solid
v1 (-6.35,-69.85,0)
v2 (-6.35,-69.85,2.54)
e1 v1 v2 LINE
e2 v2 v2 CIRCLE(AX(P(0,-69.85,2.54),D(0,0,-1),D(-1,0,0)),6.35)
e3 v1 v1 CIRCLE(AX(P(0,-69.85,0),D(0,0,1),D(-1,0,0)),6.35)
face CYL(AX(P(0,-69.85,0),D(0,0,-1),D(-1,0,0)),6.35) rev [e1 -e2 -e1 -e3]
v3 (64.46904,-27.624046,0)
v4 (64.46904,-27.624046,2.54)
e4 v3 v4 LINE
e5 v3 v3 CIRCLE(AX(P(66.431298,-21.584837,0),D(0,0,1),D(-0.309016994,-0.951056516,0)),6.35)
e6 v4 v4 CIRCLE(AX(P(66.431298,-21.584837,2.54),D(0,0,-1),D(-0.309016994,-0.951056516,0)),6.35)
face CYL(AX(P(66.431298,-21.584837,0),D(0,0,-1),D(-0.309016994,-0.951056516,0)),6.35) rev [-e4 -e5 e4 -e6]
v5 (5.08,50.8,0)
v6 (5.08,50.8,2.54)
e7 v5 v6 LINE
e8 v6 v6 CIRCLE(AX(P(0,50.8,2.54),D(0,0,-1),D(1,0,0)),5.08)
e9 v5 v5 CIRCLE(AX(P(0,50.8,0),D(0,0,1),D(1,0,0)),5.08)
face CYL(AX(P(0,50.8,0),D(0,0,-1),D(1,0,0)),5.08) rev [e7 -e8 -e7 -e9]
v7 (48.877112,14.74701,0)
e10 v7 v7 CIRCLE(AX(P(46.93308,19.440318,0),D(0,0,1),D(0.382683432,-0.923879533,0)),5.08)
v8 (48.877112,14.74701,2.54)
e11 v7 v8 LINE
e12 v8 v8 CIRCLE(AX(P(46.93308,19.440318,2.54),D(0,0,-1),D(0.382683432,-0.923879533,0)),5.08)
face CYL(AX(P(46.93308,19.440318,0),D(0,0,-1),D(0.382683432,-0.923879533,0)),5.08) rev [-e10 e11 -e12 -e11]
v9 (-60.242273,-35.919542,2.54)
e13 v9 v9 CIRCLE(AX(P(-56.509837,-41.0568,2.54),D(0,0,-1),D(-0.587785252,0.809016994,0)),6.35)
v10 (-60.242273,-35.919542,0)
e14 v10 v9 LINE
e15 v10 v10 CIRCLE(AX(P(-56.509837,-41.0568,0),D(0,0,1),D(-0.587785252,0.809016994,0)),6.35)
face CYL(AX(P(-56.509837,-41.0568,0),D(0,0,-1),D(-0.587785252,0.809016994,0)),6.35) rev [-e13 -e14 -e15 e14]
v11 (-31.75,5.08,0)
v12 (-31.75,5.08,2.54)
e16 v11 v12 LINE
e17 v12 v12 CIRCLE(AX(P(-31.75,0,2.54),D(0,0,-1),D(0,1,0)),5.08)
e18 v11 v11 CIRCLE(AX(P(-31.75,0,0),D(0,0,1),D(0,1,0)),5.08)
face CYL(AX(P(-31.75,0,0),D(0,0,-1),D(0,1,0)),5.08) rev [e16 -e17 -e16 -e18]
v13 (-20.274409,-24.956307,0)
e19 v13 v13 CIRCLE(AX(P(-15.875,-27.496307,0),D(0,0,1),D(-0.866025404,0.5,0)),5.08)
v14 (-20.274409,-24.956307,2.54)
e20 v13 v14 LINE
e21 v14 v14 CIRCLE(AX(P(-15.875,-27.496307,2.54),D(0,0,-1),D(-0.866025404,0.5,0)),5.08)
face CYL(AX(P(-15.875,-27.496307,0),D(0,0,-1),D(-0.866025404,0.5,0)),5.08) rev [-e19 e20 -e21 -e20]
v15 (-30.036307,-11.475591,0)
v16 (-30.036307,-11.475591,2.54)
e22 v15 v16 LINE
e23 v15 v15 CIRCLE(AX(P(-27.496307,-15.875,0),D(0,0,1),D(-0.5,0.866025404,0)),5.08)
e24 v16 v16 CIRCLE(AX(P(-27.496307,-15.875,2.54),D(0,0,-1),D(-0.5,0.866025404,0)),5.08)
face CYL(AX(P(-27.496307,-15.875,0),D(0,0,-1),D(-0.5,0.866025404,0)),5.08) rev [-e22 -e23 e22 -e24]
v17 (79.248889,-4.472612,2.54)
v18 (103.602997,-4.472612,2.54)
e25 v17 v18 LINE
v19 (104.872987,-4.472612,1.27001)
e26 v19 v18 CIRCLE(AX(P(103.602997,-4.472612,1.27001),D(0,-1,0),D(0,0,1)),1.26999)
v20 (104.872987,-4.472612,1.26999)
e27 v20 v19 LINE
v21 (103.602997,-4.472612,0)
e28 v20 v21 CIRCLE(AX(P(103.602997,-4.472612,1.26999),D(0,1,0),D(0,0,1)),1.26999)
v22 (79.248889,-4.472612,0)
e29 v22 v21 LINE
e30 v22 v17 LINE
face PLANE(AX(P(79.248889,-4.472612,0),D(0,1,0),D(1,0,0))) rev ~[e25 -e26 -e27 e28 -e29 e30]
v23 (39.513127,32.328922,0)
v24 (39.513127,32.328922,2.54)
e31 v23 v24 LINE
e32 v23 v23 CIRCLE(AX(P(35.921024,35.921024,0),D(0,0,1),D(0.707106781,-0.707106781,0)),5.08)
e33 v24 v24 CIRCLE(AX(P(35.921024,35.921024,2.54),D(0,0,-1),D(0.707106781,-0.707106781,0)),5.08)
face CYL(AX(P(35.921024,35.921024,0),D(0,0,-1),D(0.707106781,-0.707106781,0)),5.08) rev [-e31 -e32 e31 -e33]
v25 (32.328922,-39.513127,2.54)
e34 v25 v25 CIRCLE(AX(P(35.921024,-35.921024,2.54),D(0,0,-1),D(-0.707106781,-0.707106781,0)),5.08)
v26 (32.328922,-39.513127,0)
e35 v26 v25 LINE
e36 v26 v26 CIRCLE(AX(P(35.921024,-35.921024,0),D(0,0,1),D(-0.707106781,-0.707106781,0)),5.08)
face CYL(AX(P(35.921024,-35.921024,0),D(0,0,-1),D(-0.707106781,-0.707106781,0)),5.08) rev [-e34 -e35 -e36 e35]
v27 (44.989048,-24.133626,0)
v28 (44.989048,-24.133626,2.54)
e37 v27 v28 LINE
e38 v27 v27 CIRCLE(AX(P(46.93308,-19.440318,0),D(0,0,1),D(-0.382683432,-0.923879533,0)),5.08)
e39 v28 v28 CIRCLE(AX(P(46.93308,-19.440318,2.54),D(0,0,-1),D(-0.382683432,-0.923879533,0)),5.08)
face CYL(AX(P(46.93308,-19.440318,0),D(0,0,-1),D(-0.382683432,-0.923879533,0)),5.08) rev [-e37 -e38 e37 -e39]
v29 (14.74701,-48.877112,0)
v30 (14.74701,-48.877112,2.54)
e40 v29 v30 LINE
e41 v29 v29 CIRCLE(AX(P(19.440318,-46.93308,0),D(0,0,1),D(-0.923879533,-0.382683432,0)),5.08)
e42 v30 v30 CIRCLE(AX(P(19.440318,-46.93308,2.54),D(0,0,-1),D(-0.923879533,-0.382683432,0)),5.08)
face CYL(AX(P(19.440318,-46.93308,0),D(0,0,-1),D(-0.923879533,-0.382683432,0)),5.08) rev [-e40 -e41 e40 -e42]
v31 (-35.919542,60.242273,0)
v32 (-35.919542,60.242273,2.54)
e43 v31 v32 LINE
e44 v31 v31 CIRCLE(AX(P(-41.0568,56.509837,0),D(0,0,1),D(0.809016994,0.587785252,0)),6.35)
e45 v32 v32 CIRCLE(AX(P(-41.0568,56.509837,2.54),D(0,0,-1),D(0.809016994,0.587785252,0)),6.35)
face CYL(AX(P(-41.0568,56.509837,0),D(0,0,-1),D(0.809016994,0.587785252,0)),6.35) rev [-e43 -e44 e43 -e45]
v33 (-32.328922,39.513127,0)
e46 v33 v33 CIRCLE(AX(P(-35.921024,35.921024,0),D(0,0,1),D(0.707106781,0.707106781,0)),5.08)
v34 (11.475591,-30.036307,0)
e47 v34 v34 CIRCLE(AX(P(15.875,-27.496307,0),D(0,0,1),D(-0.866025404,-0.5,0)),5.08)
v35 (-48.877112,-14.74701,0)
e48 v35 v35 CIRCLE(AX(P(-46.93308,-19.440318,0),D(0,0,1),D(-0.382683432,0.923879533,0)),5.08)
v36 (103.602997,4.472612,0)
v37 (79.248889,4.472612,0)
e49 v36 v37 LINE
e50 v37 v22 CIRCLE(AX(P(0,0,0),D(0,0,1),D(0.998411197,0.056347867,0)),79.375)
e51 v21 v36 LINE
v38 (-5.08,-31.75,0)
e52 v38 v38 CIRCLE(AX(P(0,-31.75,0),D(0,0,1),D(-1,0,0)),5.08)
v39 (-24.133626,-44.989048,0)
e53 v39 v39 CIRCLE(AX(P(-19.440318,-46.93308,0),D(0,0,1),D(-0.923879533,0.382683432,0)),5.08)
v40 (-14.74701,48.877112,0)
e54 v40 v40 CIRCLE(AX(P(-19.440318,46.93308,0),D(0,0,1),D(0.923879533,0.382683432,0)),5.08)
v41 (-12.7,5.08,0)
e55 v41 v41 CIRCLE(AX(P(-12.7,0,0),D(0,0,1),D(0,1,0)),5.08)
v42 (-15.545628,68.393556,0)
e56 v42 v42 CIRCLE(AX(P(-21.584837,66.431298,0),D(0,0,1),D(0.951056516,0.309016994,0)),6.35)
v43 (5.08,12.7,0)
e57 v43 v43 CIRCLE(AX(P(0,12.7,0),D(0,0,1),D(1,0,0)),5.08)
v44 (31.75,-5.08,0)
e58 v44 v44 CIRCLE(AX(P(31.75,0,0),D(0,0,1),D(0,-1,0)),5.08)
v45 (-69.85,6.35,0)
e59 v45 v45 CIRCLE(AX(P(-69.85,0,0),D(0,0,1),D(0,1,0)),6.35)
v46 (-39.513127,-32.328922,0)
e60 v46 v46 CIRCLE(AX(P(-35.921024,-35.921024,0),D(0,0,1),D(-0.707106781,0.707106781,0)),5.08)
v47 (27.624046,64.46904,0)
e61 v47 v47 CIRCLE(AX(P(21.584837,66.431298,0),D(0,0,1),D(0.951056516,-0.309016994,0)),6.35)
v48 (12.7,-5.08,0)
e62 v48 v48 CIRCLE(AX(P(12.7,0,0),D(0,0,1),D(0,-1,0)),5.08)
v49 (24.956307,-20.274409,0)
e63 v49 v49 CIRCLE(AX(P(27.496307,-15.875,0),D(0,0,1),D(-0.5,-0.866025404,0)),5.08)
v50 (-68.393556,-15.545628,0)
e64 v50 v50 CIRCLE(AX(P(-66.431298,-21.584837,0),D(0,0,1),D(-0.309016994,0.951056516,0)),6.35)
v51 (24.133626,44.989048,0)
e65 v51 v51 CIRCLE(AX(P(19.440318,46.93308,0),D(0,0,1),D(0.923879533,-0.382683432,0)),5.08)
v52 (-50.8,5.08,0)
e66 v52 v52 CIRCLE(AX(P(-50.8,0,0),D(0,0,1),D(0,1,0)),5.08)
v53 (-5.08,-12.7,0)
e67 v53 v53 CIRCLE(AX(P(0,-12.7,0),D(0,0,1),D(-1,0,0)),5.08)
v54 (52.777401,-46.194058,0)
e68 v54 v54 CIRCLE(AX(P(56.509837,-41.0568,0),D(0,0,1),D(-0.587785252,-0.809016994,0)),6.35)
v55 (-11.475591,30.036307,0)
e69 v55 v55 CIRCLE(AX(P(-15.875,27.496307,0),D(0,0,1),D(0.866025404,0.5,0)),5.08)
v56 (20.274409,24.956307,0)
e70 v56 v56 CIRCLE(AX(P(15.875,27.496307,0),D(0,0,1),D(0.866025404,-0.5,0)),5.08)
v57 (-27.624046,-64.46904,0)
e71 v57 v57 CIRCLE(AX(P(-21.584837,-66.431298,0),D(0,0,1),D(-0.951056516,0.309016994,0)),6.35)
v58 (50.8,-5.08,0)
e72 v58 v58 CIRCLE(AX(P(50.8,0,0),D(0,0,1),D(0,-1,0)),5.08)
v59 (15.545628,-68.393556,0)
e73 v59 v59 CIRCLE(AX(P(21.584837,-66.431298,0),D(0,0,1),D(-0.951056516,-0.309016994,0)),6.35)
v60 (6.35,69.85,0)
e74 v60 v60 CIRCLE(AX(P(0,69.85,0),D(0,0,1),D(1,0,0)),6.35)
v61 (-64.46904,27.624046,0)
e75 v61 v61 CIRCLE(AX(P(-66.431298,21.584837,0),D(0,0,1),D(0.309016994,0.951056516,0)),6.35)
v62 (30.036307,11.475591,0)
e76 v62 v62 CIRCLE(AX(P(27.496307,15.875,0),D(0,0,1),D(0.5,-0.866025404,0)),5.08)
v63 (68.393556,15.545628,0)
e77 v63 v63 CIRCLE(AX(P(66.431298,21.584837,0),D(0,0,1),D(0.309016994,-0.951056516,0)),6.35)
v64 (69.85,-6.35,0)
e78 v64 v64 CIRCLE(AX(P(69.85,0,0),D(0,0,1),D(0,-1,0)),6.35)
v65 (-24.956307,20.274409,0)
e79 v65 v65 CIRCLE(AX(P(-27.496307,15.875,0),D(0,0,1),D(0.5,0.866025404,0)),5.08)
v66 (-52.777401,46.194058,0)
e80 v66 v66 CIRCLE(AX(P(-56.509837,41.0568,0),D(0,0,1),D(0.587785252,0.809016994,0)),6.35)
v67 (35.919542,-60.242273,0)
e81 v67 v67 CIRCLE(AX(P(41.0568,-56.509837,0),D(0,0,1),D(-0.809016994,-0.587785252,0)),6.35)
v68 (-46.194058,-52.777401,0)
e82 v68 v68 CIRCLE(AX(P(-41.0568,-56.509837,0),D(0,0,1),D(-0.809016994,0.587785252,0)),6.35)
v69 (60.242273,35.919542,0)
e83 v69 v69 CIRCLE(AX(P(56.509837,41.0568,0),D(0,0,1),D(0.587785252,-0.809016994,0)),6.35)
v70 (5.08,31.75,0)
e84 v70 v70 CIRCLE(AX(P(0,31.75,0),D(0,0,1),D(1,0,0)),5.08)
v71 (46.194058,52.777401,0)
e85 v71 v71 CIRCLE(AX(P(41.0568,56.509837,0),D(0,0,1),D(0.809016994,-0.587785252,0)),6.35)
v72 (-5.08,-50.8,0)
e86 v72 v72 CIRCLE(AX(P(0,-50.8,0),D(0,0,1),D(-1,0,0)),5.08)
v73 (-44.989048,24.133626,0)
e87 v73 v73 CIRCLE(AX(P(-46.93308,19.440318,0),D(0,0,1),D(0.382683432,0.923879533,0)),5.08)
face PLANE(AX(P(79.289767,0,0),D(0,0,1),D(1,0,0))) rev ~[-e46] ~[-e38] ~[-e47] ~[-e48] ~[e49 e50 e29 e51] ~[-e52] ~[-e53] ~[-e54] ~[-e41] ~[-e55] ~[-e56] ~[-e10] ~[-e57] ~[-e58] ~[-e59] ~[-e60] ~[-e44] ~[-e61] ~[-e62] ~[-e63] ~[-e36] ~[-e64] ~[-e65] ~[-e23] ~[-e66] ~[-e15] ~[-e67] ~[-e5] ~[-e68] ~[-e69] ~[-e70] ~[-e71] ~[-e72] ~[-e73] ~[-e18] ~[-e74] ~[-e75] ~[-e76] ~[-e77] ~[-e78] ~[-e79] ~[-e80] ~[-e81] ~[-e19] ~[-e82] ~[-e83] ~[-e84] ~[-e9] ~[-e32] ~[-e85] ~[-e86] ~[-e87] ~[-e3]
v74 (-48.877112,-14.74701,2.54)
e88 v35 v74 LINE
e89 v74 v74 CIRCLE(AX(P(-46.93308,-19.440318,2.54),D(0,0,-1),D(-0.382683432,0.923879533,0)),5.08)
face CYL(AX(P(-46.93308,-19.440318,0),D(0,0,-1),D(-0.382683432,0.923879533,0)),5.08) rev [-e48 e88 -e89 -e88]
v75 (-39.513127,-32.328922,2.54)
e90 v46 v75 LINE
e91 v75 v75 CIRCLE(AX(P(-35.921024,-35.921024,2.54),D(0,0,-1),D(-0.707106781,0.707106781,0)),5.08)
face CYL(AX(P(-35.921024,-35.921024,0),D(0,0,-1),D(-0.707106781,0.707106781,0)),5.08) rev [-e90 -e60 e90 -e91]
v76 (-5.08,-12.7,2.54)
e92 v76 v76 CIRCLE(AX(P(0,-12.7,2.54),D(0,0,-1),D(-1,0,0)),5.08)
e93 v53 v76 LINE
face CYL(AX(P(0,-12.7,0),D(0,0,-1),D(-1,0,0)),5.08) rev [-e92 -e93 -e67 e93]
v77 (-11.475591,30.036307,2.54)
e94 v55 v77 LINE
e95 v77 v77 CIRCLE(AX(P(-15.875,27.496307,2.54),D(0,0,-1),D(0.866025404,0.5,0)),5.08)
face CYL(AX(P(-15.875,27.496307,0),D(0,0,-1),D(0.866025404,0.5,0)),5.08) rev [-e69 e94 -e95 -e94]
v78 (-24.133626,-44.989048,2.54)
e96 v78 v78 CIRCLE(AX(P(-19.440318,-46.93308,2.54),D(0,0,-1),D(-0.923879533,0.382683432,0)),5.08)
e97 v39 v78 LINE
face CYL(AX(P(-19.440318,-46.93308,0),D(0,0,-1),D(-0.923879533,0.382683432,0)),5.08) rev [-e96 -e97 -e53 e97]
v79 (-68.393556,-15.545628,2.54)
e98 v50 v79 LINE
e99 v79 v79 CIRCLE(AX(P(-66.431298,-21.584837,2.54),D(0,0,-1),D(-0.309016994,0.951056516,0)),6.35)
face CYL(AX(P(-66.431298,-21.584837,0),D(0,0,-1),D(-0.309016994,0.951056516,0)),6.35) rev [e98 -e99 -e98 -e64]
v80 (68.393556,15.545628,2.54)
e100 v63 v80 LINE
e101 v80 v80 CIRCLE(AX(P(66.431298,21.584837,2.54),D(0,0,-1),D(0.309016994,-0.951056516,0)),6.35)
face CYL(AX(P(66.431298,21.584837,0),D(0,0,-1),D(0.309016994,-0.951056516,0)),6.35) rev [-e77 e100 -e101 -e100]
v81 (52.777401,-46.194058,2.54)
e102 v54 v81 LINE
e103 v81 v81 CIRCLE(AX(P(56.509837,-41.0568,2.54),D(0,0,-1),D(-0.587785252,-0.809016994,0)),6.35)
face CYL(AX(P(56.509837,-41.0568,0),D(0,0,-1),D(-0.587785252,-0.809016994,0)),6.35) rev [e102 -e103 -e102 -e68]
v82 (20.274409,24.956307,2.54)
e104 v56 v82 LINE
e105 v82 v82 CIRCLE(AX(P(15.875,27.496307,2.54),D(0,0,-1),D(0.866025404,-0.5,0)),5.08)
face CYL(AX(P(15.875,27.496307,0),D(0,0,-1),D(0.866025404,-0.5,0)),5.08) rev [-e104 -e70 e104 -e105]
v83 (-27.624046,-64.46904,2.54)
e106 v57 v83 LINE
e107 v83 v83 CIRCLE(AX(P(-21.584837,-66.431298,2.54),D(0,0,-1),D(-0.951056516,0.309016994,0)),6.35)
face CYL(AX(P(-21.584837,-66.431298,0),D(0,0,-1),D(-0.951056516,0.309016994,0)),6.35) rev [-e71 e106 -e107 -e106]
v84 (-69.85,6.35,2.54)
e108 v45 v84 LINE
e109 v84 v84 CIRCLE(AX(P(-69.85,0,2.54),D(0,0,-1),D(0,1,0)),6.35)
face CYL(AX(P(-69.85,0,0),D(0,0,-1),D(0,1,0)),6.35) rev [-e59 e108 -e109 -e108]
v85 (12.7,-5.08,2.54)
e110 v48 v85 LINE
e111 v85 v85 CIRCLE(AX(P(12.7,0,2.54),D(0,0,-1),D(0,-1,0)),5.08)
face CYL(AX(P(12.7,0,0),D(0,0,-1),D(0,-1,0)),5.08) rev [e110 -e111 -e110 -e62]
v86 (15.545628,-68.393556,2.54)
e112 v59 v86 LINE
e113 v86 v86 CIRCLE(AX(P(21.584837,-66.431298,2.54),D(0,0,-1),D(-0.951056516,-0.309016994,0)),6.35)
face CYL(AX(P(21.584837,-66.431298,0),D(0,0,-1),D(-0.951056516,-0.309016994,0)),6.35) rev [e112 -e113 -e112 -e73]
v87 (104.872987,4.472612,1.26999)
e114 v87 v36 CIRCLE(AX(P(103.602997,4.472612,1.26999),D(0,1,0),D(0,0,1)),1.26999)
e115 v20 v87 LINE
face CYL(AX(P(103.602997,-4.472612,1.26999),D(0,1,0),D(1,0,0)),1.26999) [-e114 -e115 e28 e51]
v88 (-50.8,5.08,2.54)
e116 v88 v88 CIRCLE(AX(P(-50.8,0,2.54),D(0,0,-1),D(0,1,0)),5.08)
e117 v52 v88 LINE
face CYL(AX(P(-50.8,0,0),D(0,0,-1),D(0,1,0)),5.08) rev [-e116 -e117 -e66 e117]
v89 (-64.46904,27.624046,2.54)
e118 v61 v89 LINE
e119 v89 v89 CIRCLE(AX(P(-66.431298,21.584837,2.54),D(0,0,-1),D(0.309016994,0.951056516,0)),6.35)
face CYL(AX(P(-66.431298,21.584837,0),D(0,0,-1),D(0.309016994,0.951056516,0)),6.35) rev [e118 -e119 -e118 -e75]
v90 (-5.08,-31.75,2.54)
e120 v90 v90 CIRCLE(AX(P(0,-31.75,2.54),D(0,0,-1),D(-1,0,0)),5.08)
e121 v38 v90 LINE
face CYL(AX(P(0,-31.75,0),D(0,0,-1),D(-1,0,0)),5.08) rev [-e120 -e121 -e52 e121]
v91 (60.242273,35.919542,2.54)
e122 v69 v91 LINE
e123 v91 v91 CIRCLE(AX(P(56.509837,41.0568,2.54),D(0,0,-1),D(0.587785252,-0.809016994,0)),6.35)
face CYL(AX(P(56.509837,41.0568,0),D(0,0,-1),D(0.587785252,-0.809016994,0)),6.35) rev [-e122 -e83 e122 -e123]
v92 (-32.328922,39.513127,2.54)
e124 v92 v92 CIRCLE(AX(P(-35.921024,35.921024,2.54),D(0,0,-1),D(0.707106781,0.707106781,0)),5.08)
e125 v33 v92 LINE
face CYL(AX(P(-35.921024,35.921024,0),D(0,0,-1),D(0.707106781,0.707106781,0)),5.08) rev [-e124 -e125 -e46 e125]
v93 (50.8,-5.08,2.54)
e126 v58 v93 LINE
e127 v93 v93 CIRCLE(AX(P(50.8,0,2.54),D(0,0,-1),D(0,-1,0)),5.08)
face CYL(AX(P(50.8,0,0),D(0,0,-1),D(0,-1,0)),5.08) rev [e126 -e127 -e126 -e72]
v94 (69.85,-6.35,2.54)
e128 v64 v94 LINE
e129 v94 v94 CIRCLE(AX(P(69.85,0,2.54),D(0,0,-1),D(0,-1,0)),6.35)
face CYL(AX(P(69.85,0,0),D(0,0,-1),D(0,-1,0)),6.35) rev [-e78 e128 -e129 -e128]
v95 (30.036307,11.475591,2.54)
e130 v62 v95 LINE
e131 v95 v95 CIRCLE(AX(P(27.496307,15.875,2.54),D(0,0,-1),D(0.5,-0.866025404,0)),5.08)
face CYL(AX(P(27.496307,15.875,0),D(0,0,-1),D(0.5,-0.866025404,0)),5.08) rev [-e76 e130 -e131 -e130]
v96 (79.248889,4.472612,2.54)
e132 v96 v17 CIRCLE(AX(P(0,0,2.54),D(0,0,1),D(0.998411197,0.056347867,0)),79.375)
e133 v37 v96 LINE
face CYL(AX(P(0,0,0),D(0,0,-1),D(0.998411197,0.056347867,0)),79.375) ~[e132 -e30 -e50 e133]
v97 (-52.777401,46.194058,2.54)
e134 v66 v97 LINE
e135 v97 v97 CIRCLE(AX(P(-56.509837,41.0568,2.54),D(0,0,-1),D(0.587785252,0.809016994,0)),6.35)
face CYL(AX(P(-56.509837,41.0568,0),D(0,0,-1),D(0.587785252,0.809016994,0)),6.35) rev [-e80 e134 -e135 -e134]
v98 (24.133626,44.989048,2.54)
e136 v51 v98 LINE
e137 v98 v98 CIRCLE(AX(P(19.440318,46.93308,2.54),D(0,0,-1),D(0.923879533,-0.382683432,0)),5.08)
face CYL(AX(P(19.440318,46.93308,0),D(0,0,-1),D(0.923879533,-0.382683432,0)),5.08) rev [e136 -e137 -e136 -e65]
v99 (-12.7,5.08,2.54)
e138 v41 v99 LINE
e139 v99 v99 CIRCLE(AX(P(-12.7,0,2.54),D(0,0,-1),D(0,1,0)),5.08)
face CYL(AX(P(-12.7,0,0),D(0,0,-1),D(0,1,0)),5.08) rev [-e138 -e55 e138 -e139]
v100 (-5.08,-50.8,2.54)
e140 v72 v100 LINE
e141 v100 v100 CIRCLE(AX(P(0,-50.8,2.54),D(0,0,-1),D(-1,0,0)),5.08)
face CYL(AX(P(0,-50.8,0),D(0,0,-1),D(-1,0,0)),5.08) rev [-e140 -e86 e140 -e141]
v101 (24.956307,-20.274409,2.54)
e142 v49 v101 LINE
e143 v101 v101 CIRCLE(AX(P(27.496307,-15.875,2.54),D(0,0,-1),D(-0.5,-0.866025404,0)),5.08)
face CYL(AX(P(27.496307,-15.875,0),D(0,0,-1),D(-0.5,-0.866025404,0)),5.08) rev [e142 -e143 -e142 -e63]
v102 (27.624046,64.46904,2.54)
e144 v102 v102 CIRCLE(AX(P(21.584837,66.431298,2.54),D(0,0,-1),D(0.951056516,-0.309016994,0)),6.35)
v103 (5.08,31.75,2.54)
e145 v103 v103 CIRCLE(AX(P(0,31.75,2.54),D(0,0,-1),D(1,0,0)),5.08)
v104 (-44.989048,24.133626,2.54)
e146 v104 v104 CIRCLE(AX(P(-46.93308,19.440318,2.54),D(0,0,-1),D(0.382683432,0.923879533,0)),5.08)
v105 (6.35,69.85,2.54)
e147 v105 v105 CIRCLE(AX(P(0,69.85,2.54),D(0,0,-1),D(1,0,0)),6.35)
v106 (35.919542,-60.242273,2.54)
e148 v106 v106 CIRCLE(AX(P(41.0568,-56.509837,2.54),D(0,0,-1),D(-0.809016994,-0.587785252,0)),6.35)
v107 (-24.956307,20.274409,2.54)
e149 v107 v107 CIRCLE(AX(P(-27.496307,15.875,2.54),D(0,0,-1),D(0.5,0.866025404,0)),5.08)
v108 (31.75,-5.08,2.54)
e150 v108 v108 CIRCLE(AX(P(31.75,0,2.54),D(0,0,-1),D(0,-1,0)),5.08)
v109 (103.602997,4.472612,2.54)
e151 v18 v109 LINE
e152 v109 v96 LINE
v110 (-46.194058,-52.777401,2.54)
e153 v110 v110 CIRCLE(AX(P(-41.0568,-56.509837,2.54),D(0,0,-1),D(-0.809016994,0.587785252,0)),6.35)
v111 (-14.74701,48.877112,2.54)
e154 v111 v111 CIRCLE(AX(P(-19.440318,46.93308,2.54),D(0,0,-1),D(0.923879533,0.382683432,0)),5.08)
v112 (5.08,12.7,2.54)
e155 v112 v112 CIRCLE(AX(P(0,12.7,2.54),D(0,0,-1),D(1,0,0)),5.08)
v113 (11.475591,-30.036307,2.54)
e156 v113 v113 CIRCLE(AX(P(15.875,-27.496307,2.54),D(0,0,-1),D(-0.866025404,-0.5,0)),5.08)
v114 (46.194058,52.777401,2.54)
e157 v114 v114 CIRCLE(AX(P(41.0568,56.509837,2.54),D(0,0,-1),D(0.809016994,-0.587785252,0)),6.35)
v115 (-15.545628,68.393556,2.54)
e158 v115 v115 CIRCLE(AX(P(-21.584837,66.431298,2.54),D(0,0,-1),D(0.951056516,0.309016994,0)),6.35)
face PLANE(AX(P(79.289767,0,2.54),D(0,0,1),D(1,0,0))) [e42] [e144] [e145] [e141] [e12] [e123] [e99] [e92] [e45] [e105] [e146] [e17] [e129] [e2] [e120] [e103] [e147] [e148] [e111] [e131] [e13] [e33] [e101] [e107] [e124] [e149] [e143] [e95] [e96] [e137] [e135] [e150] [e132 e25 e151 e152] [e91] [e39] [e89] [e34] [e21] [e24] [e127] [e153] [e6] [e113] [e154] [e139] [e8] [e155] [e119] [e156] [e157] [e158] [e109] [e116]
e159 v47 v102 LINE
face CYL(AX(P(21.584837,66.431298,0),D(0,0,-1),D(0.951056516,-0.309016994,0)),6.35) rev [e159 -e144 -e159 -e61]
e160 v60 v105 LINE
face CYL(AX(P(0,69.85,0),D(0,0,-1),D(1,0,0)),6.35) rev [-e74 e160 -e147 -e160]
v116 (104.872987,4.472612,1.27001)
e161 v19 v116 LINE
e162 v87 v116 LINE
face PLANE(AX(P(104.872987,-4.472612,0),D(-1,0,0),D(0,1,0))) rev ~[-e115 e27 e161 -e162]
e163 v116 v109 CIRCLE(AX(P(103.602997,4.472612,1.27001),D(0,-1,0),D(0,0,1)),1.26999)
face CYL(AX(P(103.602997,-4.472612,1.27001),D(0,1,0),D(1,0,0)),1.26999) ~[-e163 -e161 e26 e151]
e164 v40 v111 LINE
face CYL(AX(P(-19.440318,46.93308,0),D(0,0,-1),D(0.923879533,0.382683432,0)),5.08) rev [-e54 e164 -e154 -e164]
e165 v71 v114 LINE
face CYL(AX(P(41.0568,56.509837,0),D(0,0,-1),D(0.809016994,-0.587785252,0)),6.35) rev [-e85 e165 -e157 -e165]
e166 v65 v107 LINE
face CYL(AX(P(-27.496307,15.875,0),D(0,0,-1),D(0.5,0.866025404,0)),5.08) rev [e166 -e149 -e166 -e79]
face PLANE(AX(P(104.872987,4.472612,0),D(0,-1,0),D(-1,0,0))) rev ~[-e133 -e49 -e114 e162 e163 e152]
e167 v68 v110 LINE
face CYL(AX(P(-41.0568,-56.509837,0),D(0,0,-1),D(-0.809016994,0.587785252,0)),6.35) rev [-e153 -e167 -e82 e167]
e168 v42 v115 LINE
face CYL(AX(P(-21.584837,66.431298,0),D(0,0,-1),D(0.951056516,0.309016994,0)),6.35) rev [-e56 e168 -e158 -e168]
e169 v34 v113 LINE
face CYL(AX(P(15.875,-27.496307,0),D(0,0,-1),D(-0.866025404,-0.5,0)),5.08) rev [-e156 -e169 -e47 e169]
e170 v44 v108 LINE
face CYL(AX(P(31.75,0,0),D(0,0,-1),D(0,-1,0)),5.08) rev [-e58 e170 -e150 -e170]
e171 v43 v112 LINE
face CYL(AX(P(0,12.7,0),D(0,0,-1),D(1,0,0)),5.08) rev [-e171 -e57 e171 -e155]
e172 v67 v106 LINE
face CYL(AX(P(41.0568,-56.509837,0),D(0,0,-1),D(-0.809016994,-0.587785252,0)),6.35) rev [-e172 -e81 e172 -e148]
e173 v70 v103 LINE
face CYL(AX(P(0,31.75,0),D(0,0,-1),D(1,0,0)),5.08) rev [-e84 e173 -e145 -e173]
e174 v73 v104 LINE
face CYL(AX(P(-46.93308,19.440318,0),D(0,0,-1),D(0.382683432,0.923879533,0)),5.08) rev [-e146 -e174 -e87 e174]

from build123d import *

# Parameters (mm, degrees)
F1_DEPTH         = 2.54
F4_R             = 5.08
F5_DEPTH         = 25.4
F5_COPIES_COUNT  = 16
F6_R             = 6.35
F8_DEPTH         = 25.4
F8_COPIES_COUNT  = 20
F3_R             = 5.08
F9_DEPTH         = 25.4
F9_COPIES_COUNT  = 12
F2_R             = 5.08
F10_DEPTH        = 25.4
F10_COPIES_COUNT = 4
F11_R            = 1.26999


# Not quite as in the source:
# - a fillet or chamfer is up to 0.001 mm smaller than in the source, because OpenCascade refuses the exact size
# - a pattern or mirror of a feature is missing from the dataset's text; its kind, count and spacing are read off the source's solid


with BuildPart() as f1:
    # F0 (on Top) → F1 (new body)
    with BuildSketch(Plane.XY):
        with BuildLine():
            ThreePointArc((79.2488887438, -4.4726119748), (79.343465922, -2.2371947795), (79.375, 0))
            ThreePointArc((79.375, 0), (79.343465922, 2.2371947795), (79.2488887438, 4.4726119748))
            Line((79.2488887438, 4.4726119748), (79.2488887438, -4.4726119748))
        make_face()
        with BuildLine():
            ThreePointArc((79.2488887438, 4.4726119748), (79.343465922, 2.2371947795), (79.375, 0))
            ThreePointArc((79.375, 0), (79.343465922, -2.2371947795), (79.2488887438, -4.4726119748))
            Line((79.2488887438, -4.4726119748), (104.8729870915, -4.4726119748))
            Line((104.8729870915, -4.4726119748), (104.8729870915, 4.4726119748))
            Line((104.8729870915, 4.4726119748), (79.2488887438, 4.4726119748))
        make_face()
        with BuildLine():
            Line((79.2488887438, -4.4726119748), (79.2488887438, 4.4726119748))
            ThreePointArc((79.2488887438, 4.4726119748), (-79.375, 0), (79.2488887438, -4.4726119748))
        make_face()
    extrude(amount=F1_DEPTH)

    # F4 (on Top) → F5 (cut)
    with BuildSketch(Plane.XY):
        with Locations((0, 50.8)):
            Circle(F4_R)
    f5 = extrude(amount=F5_DEPTH, mode=Mode.SUBTRACT)

    # F5_copies: F5 ×16 about axis
    f5_copies_axis = Axis((0, 0, 0), (0, 0, 1))
    for i in range(1, F5_COPIES_COUNT):
        add(f5.rotate(f5_copies_axis, i * 360 / F5_COPIES_COUNT), mode=Mode.SUBTRACT)

    # F6 (on Top) → F8 (cut)
    with BuildSketch(Plane.XY):
        with Locations((0, 69.85)):
            Circle(F6_R)
    f8 = extrude(amount=F8_DEPTH, mode=Mode.SUBTRACT)

    # F8_copies: F8 ×20 about axis
    f8_copies_axis = Axis((0, 0, 0), (0, 0, 1))
    for i in range(1, F8_COPIES_COUNT):
        add(f8.rotate(f8_copies_axis, i * 360 / F8_COPIES_COUNT), mode=Mode.SUBTRACT)

    # F3 (on Top) → F9 (cut)
    with BuildSketch(Plane.XY):
        with Locations((0, 31.75)):
            Circle(F3_R)
    f9 = extrude(amount=F9_DEPTH, mode=Mode.SUBTRACT)

    # F9_copies: F9 ×12 about axis
    f9_copies_axis = Axis((0, 0, 0), (0, 0, 1))
    for i in range(1, F9_COPIES_COUNT):
        add(f9.rotate(f9_copies_axis, i * 360 / F9_COPIES_COUNT), mode=Mode.SUBTRACT)

    # F2 (on Top) → F10 (cut)
    with BuildSketch(Plane.XY):
        with Locations((0, 12.7)):
            Circle(F2_R)
    f10 = extrude(amount=F10_DEPTH, mode=Mode.SUBTRACT)

    # F10_copies: F10 ×4 about axis
    f10_copies_axis = Axis((0, 0, 0), (0, 0, 1))
    for i in range(1, F10_COPIES_COUNT):
        add(f10.rotate(f10_copies_axis, i * 360 / F10_COPIES_COUNT), mode=Mode.SUBTRACT)

    # F11 (radius 1.27 in the source; OpenCascade refuses exactly that, so slightly less here)
    f11_edges = [f1.edges().sort_by_distance(p)[0] for p in [
        (104.872987, 0, 0),
        (104.872987, 0, 2.54),
    ]]
    fillet(f11_edges, radius=F11_R)


solid = f1.part
